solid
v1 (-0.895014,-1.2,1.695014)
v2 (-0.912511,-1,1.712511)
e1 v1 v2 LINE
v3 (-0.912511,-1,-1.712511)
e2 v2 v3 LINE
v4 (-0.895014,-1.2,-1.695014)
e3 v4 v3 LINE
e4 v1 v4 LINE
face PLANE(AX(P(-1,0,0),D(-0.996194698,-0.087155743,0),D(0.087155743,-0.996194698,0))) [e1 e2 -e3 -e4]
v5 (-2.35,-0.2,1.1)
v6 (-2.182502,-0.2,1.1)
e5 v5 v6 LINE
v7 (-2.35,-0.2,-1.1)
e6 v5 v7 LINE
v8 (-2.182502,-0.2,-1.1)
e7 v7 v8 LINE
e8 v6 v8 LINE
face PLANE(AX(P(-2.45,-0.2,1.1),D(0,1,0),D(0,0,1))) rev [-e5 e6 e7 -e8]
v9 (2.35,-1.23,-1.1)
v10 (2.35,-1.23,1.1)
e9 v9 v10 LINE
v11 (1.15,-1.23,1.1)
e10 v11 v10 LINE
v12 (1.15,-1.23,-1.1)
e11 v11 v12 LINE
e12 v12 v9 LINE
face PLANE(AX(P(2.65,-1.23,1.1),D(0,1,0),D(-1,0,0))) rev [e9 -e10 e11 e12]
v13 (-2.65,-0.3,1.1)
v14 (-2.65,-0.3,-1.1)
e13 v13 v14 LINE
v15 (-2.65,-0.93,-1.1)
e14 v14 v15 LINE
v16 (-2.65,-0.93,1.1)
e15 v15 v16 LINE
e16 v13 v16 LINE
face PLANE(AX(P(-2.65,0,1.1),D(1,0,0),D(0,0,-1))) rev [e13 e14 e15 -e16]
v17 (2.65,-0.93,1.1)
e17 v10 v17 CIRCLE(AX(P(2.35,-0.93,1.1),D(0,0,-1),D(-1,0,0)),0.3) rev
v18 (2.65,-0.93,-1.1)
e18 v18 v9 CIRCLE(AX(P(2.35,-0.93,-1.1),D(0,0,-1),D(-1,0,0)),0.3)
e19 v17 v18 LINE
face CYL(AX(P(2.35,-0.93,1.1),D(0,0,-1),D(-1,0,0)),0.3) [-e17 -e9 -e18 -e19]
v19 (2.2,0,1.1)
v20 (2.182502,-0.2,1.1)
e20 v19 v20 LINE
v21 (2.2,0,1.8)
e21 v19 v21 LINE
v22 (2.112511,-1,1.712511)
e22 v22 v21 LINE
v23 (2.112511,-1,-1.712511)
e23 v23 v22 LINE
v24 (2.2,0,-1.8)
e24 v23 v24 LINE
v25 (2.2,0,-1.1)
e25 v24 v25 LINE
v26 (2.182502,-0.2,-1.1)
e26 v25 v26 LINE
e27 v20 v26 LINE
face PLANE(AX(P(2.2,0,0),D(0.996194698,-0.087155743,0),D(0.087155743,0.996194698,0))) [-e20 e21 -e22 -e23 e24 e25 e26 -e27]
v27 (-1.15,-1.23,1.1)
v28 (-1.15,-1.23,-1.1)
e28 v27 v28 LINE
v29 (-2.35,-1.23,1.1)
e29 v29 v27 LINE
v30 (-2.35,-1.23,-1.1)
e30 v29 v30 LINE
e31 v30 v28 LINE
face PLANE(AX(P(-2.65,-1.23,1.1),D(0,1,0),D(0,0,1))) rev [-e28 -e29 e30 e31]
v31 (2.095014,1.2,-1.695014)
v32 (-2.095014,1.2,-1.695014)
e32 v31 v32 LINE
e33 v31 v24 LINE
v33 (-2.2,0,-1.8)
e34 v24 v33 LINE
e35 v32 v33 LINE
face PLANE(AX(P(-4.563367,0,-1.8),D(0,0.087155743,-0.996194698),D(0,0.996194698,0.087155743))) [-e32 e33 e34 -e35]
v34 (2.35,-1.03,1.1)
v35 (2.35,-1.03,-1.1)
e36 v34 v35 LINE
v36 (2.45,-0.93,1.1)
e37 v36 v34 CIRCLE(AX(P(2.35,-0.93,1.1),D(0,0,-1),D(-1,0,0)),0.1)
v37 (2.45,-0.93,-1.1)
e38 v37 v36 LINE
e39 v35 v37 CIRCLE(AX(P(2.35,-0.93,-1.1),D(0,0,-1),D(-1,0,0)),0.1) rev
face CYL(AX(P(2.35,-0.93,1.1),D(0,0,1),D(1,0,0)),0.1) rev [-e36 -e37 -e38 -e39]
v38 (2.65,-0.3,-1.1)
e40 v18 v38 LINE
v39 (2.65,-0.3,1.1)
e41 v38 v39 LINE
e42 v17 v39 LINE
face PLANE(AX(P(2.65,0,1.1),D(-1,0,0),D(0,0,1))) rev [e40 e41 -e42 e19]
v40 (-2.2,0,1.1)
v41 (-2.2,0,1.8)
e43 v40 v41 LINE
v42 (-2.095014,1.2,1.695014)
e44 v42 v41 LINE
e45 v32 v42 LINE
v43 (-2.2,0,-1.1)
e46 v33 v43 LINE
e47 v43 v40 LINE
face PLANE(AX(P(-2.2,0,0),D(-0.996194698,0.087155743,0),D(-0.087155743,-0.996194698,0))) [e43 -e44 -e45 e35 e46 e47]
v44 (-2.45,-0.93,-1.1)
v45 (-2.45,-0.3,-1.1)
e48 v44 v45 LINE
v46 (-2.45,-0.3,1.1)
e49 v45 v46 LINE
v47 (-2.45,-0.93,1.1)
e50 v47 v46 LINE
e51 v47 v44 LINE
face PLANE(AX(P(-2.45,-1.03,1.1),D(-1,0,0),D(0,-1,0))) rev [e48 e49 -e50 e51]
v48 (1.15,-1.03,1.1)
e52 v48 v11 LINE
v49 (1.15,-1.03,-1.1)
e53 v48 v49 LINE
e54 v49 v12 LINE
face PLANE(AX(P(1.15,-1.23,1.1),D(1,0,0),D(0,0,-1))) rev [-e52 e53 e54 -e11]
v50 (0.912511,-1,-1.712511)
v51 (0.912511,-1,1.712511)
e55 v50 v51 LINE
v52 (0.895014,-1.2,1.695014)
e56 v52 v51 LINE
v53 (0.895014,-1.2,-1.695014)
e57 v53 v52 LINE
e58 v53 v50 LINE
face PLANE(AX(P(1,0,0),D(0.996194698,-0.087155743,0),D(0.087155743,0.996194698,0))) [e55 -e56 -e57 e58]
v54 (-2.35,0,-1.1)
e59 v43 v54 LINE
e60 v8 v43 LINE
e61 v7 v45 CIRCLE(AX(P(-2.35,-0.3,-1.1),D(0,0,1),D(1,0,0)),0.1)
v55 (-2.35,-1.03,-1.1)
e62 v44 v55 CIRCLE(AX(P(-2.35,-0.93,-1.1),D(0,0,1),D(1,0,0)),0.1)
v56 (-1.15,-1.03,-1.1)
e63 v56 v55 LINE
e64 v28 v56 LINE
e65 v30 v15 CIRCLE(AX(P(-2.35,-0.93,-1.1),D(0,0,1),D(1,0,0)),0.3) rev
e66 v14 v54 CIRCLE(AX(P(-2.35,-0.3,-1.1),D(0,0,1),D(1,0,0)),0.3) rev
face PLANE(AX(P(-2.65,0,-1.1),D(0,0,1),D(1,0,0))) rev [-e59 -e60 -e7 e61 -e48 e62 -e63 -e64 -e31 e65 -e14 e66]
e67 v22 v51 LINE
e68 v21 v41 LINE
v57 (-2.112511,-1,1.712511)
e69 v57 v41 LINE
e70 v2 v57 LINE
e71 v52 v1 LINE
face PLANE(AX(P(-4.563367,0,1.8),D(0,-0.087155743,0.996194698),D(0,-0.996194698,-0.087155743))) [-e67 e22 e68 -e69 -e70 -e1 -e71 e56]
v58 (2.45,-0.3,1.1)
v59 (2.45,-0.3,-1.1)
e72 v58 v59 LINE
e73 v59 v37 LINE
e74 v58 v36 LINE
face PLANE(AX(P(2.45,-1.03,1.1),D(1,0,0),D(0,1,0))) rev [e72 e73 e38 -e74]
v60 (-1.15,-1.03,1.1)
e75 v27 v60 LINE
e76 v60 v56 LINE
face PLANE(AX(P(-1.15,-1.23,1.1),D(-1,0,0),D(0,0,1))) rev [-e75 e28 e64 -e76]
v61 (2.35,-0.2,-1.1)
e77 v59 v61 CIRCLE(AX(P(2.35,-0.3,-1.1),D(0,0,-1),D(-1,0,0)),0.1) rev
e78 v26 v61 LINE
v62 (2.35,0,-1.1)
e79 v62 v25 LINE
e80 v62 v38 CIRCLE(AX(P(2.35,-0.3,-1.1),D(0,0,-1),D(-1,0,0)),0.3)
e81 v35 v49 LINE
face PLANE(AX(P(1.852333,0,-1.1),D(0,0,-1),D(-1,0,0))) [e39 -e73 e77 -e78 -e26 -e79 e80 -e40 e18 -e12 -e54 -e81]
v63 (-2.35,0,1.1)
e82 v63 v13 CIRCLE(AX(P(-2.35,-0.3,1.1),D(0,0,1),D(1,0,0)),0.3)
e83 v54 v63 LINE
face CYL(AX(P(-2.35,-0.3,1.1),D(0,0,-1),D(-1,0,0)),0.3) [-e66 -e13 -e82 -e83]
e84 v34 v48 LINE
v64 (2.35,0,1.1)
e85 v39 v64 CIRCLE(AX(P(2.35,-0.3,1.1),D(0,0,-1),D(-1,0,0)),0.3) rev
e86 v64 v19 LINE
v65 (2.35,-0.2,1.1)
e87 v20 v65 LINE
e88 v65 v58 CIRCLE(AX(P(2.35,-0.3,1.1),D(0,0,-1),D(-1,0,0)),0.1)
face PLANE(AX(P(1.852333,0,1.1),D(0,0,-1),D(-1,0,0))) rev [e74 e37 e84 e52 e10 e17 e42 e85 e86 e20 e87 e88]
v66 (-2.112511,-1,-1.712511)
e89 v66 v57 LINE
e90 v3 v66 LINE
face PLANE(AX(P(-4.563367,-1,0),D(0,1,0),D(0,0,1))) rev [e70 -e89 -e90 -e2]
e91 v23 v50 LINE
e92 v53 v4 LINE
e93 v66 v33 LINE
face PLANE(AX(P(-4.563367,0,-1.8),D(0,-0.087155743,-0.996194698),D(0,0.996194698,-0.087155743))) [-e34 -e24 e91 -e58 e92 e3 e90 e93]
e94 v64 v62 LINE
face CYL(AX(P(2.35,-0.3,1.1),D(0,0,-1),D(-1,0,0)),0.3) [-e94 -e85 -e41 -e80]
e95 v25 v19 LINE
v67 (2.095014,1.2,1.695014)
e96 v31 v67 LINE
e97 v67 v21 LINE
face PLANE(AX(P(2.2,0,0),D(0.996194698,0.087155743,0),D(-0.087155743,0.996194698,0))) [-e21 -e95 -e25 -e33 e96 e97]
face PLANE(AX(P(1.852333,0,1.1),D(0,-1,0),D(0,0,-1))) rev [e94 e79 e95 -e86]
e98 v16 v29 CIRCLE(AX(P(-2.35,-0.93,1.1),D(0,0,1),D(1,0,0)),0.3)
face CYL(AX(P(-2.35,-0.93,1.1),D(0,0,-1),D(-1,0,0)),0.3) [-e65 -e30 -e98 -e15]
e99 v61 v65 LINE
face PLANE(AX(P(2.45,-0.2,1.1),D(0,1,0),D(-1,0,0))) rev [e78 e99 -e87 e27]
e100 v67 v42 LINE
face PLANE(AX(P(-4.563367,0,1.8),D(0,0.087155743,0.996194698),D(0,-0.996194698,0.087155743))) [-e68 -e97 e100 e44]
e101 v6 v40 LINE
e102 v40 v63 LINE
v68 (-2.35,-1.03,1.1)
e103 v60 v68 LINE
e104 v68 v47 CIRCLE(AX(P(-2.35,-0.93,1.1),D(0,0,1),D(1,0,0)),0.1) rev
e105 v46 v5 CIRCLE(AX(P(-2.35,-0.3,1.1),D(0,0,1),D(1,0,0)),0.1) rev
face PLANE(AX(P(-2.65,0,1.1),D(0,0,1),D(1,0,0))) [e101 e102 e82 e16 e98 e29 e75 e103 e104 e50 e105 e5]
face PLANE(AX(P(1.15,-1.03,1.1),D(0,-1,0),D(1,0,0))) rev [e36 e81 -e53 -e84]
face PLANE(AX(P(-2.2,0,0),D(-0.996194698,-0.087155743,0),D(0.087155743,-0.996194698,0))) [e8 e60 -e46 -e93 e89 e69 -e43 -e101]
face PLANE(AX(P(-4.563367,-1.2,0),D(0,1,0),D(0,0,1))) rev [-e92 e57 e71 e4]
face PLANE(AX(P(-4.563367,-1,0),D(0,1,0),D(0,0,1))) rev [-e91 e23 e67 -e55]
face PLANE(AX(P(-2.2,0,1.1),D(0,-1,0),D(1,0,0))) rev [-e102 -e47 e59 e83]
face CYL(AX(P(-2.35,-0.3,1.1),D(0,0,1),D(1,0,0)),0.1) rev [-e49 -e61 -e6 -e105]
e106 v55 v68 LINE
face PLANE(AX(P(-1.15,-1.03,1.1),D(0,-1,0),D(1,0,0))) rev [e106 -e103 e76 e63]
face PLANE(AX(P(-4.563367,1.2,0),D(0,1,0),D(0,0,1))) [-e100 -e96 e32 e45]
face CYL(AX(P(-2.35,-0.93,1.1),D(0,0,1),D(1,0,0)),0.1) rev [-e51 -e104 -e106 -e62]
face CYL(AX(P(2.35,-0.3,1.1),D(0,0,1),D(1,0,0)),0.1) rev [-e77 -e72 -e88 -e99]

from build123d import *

# Parameters (mm, degrees)
EXTRUDE1_START      = -2.2
EXTRUDE1_DEPTH      = 4.4
EXTRUDE1_START_2    = -3
EXTRUDE1_2_DEPTH    = 6
SKETCH1_3_W         = 2
SKETCH1_3_H         = 3.6
EXTRUDE2_DEPTH      = 1.2
EXTRUDE2_DRAFT      = -5
EXTRUDE3_DEPTH      = 1.1
EXTRUDE3_DEPTH_BACK = 1.1
FILLET1_R           = 0.1
FILLET2_R           = 0.3


with BuildPart() as part:
    # Extrude1: read off the stored shape, not the designer's step
    # Extrude1 outline → Extrude1 (new body)
    with BuildSketch(Plane.YZ.offset(EXTRUDE1_START)):
        Polygon((-1, -1.712511336), (0, -1.8), (1.2, -1.695013604), (1.2, 1.695013604), (0, 1.8), (-1, 1.712511336), align=None)
    extrude(amount=EXTRUDE1_DEPTH)

    # Extrude1 2 outline → Extrude1 2 (cut)
    with BuildSketch(Plane.XY.offset(EXTRUDE1_START_2)):
        Polygon((-2.2, 0), (-2.095013604, 1.2), (-2.2, 1.2), align=None)
        Polygon((-2.112511336, -1), (-2.2, 0), (-2.2, -1), align=None)
        Polygon((2.2, 1.2), (2.095013604, 1.2), (2.2, 0), align=None)
        Polygon((2.2, -1), (2.2, 0), (2.112511336, -1), align=None)
    extrude(amount=EXTRUDE1_2_DEPTH, mode=Mode.SUBTRACT)


with BuildPart() as extrude2_tool:
    # Sketch1<3> → Extrude2 (with draft: the straight prism first)
    with BuildSketch(Plane(origin=(0, 0, 0), x_dir=(1, 0, 0), z_dir=(0, 1, 0))):
        Rectangle(SKETCH1_3_W, SKETCH1_3_H)
    extrude(amount=-EXTRUDE2_DEPTH)
    # Extrude2: the draft: its side faces are tilted about the plane it starts from
    extrude2_sides = [extrude2_tool.faces().sort_by_distance(p)[0] for p in [
        (1, -0.6, 0),
        (0, -0.6, -1.8),
        (-1, -0.6, 0),
        (0, -0.6, 1.8),
    ]]
    draft(extrude2_sides, Plane(origin=(0, 0, 0), x_dir=(1, 0, 0), z_dir=(0, 1, 0)), EXTRUDE2_DRAFT)


with BuildPart() as part_1:
    add(part.part)

    # Extrude2: add extrude2_tool
    add(extrude2_tool.part)

    # Sketch2 → Extrude3 (add, two sides: drawn at the far end of the back side and taken through both)
    with BuildSketch(Plane.XY.offset(-EXTRUDE3_DEPTH_BACK)):
        Polygon((-2.2, 0), (-2.65, 0), (-2.65, -1.23), (-1.15, -1.23), (-1.15, -1.03), (-2.45, -1.03), (-2.45, -0.2), (-1.852332632, -0.2), (-1.852332632, 0), align=None)
        Polygon((1.852332632, 0), (2.2, 0), (2.65, 0), (2.65, -1.23), (1.15, -1.23), (1.15, -1.03), (2.45, -1.03), (2.45, -0.2), (1.852332632, -0.2), align=None)
    extrude(amount=EXTRUDE3_DEPTH + EXTRUDE3_DEPTH_BACK)

    # Fillet1
    fillet1_edges = [part_1.edges().sort_by_distance(p)[0] for p in [
        (-2.45, -1.03, 0),
        (-2.45, -0.2, 0),
        (2.45, -0.2, 0),
        (2.45, -1.03, 0),
    ]]
    fillet(fillet1_edges, radius=FILLET1_R)

    # Fillet2
    fillet2_edges = [part_1.edges().sort_by_distance(p)[0] for p in [
        (-2.65, 0, 0),
        (-2.65, -1.23, 0),
        (2.65, 0, 0),
        (2.65, -1.23, 0),
    ]]
    fillet(fillet2_edges, radius=FILLET2_R)


solid = part_1.part
